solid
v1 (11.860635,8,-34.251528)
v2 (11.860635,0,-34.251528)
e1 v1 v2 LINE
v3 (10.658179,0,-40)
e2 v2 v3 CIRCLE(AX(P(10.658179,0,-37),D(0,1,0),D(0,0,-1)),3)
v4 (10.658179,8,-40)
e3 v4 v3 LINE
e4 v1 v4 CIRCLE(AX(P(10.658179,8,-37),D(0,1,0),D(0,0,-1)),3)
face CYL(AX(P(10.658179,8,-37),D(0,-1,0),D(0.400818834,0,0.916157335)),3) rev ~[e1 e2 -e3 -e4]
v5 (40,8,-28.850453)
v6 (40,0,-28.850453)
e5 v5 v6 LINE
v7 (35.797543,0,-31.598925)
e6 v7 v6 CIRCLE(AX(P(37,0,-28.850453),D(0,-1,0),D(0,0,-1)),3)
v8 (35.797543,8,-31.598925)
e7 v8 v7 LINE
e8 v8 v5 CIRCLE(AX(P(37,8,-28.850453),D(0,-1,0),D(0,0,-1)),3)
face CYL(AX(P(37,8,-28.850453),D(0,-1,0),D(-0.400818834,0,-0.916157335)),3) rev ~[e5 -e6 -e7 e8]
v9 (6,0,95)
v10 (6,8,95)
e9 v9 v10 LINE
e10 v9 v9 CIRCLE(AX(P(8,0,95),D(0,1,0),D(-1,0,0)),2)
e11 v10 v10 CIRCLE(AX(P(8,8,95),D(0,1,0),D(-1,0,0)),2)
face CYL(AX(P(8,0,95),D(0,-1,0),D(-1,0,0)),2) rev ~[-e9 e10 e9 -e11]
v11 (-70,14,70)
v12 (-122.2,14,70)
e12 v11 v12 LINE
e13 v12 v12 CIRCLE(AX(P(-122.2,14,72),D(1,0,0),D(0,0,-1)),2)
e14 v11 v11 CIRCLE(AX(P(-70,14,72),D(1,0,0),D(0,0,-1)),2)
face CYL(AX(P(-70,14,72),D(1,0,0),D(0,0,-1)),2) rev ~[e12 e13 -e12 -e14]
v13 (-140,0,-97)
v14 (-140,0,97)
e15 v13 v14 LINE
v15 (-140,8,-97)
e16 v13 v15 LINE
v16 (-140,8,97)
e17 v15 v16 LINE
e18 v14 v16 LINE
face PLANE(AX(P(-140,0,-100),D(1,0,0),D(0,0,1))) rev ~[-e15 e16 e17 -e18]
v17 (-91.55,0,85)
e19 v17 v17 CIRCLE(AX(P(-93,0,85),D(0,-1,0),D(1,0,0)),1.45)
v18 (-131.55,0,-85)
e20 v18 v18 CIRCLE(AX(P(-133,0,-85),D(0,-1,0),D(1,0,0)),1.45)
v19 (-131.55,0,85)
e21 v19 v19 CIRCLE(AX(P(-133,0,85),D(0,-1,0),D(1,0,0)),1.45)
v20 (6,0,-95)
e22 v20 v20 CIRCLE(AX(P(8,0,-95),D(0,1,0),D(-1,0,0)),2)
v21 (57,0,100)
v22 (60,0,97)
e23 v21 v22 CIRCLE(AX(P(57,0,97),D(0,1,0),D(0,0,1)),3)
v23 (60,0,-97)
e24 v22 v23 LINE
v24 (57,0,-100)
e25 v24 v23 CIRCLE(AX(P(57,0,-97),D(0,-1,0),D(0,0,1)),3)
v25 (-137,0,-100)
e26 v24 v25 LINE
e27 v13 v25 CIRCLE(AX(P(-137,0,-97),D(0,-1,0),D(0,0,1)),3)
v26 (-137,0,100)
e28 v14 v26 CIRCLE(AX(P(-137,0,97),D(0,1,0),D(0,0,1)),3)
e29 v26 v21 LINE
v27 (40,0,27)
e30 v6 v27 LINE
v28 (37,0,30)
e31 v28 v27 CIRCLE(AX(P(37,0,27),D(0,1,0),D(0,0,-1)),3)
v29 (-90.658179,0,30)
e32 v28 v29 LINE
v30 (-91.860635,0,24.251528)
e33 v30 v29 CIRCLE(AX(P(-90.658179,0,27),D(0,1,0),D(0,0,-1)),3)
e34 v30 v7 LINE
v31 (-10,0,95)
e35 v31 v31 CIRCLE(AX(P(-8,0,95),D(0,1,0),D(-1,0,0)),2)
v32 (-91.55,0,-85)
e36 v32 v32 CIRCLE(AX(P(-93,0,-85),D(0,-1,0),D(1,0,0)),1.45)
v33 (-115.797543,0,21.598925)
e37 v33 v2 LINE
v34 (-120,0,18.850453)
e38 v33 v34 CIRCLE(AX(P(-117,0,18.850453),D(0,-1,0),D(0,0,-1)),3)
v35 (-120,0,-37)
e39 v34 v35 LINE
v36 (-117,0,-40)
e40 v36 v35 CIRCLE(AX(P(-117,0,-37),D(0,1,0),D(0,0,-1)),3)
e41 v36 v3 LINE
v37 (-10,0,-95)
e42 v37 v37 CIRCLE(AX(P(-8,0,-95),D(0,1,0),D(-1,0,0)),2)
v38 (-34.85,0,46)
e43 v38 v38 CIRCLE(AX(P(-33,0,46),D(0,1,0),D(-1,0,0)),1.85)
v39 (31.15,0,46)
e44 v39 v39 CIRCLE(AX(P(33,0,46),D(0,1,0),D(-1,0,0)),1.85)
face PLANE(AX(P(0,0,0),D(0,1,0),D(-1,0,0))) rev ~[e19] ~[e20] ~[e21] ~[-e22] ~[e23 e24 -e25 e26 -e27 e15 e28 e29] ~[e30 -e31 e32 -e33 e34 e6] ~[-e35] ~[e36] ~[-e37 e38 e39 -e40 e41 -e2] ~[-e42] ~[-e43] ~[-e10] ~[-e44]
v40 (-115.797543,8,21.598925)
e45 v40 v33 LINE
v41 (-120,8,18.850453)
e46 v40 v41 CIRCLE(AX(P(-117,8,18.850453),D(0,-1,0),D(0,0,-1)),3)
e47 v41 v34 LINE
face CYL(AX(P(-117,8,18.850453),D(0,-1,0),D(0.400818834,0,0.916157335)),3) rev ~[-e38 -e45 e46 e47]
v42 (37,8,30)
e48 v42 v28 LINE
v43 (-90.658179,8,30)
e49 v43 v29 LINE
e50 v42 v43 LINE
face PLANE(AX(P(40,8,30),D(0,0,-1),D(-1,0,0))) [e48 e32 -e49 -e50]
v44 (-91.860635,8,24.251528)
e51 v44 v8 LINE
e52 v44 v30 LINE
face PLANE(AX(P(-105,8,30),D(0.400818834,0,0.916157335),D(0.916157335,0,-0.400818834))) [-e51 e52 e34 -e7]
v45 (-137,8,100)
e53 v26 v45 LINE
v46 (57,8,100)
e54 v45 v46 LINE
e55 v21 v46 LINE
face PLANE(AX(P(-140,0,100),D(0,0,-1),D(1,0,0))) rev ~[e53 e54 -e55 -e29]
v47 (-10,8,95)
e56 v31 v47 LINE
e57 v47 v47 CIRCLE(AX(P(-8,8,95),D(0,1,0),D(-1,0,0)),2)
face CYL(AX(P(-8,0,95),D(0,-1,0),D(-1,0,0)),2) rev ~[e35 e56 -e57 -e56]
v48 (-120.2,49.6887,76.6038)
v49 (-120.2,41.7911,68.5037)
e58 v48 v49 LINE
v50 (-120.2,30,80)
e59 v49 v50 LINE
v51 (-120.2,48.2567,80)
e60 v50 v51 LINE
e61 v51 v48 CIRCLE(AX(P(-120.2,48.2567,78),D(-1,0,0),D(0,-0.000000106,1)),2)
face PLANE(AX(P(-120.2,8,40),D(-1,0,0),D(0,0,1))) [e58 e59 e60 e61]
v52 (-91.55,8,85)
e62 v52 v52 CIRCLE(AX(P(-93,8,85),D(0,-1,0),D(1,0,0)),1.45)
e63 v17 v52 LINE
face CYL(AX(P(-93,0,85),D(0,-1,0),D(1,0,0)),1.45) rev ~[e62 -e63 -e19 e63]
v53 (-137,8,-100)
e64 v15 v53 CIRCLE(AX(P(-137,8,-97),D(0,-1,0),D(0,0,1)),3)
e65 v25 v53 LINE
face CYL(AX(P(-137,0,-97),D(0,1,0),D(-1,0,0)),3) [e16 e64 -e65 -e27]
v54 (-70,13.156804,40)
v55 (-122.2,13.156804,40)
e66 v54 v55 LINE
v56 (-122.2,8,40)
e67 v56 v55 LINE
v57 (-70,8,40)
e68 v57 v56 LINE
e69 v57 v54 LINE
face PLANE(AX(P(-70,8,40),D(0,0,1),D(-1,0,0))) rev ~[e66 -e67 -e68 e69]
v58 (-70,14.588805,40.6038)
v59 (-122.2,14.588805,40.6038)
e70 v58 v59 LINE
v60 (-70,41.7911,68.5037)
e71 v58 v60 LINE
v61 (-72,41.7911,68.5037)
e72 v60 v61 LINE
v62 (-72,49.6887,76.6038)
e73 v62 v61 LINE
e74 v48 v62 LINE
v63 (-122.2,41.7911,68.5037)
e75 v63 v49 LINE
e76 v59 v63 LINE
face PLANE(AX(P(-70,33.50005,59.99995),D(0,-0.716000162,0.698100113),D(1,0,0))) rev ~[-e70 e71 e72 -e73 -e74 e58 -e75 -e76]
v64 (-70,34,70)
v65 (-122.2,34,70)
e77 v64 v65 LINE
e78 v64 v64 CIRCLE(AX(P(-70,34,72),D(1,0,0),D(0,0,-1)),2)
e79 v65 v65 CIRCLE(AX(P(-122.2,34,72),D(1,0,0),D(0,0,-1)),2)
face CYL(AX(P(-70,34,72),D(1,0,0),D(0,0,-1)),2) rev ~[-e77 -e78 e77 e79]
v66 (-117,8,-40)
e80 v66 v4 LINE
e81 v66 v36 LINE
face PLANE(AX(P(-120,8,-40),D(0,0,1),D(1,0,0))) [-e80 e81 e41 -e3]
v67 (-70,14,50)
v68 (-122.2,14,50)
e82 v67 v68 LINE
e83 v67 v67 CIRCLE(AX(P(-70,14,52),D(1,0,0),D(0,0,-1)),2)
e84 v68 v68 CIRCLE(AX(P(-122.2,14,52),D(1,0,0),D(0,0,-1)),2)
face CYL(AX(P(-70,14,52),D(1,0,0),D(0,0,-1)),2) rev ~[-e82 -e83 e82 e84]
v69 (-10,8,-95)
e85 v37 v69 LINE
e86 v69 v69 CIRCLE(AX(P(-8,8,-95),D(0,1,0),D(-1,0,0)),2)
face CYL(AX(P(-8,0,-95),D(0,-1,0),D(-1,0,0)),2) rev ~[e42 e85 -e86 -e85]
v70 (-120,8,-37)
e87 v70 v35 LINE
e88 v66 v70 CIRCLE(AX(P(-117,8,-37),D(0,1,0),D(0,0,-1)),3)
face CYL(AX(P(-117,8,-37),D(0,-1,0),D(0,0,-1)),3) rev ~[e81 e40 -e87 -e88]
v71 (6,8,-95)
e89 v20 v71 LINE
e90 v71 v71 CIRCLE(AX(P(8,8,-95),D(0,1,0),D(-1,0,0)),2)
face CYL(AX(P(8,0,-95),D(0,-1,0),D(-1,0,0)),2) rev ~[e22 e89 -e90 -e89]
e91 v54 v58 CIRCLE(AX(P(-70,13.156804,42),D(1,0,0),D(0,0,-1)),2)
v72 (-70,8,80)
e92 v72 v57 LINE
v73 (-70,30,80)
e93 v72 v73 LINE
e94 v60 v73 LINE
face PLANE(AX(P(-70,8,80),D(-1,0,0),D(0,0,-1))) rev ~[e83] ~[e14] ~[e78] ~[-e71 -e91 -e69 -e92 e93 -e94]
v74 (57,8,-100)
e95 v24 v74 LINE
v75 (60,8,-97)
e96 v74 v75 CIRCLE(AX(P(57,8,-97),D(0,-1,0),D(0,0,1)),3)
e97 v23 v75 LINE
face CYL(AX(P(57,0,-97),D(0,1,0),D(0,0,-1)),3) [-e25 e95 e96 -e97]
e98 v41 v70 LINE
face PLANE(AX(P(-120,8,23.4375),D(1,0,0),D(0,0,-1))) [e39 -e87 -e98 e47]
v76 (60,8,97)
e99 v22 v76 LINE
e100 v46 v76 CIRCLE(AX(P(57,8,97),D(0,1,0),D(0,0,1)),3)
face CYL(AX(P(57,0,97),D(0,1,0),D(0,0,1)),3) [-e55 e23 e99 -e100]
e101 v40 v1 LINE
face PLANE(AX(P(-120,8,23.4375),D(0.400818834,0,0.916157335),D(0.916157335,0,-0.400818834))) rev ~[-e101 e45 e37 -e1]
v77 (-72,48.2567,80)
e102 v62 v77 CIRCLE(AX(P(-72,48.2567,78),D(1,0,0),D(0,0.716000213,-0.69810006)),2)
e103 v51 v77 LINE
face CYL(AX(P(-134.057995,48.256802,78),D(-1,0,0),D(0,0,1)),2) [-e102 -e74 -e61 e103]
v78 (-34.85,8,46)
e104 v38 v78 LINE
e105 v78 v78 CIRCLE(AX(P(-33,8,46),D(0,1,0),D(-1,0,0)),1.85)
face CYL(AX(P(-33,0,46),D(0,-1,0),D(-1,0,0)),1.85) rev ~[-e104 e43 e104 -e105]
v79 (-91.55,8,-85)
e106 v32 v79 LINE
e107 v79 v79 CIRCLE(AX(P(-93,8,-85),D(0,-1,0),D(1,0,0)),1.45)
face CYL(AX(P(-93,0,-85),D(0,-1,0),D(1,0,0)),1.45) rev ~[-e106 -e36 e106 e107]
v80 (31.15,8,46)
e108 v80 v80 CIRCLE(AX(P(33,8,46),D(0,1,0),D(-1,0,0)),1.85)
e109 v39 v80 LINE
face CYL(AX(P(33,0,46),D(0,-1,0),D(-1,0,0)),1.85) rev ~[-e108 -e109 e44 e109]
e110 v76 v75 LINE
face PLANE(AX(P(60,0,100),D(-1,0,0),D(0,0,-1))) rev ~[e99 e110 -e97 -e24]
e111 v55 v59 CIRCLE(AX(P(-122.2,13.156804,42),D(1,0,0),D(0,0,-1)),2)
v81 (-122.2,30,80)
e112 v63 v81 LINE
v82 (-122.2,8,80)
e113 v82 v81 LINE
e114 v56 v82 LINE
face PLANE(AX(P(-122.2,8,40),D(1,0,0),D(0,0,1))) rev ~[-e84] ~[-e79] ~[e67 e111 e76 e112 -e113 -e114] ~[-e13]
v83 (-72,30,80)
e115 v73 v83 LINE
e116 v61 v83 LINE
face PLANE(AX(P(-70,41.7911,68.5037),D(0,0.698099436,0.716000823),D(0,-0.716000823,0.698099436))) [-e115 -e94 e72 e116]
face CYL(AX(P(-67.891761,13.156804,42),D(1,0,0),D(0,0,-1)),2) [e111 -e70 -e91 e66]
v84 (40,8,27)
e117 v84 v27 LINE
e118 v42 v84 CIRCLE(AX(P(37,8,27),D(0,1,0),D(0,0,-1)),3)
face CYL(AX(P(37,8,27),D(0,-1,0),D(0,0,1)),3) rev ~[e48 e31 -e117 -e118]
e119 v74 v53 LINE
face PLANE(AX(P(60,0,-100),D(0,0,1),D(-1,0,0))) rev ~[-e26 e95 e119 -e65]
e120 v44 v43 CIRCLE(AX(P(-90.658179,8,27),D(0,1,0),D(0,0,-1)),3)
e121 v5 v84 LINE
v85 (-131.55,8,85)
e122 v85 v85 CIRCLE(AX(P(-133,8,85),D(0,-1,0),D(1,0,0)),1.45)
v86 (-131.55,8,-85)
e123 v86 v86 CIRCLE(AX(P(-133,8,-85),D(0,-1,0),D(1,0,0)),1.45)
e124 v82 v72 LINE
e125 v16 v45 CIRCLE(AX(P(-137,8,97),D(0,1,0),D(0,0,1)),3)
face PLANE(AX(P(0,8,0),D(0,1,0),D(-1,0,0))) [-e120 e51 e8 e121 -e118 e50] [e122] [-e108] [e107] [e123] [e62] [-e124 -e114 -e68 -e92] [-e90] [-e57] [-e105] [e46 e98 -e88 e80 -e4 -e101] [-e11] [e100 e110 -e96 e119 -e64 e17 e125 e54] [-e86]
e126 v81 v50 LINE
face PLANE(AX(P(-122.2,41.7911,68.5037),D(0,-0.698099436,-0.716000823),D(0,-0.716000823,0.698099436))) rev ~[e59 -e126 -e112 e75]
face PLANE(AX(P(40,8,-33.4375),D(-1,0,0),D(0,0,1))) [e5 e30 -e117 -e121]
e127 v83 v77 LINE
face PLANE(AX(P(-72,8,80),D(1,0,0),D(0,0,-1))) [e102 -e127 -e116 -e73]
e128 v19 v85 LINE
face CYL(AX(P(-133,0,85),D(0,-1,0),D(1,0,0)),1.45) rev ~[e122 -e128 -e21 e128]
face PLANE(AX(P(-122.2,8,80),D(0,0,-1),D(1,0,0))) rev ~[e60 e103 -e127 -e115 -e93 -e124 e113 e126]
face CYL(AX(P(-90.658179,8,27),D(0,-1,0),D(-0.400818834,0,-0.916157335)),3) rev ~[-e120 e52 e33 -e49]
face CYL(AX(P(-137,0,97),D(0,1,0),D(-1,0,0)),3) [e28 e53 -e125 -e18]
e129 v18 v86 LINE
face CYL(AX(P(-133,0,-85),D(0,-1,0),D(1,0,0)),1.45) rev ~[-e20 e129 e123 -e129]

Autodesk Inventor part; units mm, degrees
ref_plane "YZ Plane" through (0, 0, 0) normal (1, 0, 0) x (0, 1, 0)
ref_plane "XZ Plane" through (0, 0, 0) normal (0, 1, 0) x (-1, 0, 0)
ref_plane "XY Plane" through (0, 0, 0) normal (0, 0, 1) x (1, 0, 0)
sketch "Sketch1" plane through (0, 0, 0) normal (0, 1, 0) x (-1, 0, 0)
  line L0 (140, 100) -> (-60, 100)
  line L1 (-60, 100) -> (-60, -100)
  line L2 (-60, -100) -> (140, -100)
  line L3 (140, -100) -> (140, 100)
  line L4 (180, 0) -> (-100, 0) construction
  circle A0 centre (8, 95) radius 2
  circle A1 centre (-8, 95) radius 2
  line L5 (8, 95) -> (-8, 95) construction
  line L6 (0, -140) -> (0, 140) construction
  circle A2 centre (8, -95) radius 2
  circle A3 centre (-8, -95) radius 2
  circle A4 centre (-33, 46) radius 1.85
  circle A5 centre (33, 46) radius 1.85
  line L7 (33, 46) -> (-33, 46) construction
  point P0 (0, 0)
  point P1 (0, 95)
  point P2 (0, 46)
  dimension "d0" = 200
  dimension "d1" = 200
  dimension "d2" = 60
  dimension "d3" = 4
  dimension "d4" = 16
  dimension "d6" = 5
  dimension "d9" = 3.7
  dimension "d10" = 66
  dimension "d11" = 46
extrude "Extrusion1" add sketch "Sketch1" along normal blind 8
sketch "Sketch2" plane through (0, 8, 0) normal (0, 1, 0) x (1, 0, 0)
  line L0 (-122.2, -80) -> (-70, -80)
  line L1 (-70, -80) -> (-70, -40)
  line L2 (-70, -40) -> (-122.2, -40)
  line L3 (-122.2, -40) -> (-122.2, -80)
  line L4 (-140, -100) -> (60, -100) construction
  point P0 (0, 0)
  dimension "d12" = 52.2
  dimension "d13" = 40
  dimension "d14" = 70
  dimension "d15" = 20
extrude "Extrusion2" add sketch "Sketch2" along normal blind 45
chamfer "Chamfer1" distance 39 distance2 40 1 edges at (-96.1, 53, 40) measured on face at (-87.4, 38, 40)
fillet "Fillet1" radius 2 3 edges at (-96.1, 53, 79.9999) (-96.1, 53, 80) (-96.1, 14.0001, 40)
sketch "Sketch3" plane through (-70, 8, 80) normal (1, 0, 0) x (0, 0, -1)
  line L0 (40, 0) -> (0, 0) construction
  line L1 (0, 0) -> (0, 40.2567) construction
  circle A0 centre (8, 6) radius 2
  circle A1 centre (28, 6) radius 2
  circle A2 centre (8, 26) radius 2
  line L2 (8, 6) -> (28, 6) construction
  line L3 (8, 6) -> (8, 26) construction
  point P0 (80, -8)
  dimension "d22" = 4
  dimension "d23" = 20
  dimension "d24" = 20
  dimension "d25" = 8
  dimension "d26" = 6
extrude "Extrusion3" cut sketch "Sketch3" against normal up to surface (52.2 mm away)
sketch "Sketch6" plane through (-70, 8, 80) normal (1, 0, 0) x (0, 0, -1)
  line L0 (0, 0) -> (0, 40.2567) projected
  arc A0 (3.3962, 41.6887) -> (0, 40.2567) centre (2, 40.2567) ccw projected
  line L1 (3.3962, 41.6887) -> (39.3962, 6.5887) projected
  line L2 (11.4963, 33.7911) -> (0, 22)
  point P0 (80, -8)
  dimension "d45" = 22
extrude "Extrusion6" cut sketch "Sketch6" against normal blind 2
sketch "Sketch7" plane through (-122.2, 8, 40) normal (-1, 0, 0) x (0, 0, 1)
  line L0 (28.5037, 33.7911) -> (40, 22) projected
  line L1 (40, 0) -> (40, 40.2567) projected
  arc A0 (40, 40.2567) -> (36.6038, 41.6887) centre (38, 40.2567) ccw projected
  line L2 (36.6038, 41.6887) -> (0.6038, 6.5887) projected
  point P0 (-40, -8)
extrude "Extrusion7" cut sketch "Sketch7" against normal blind 2
sketch "Sketch4" plane through (0, 0, 0) normal (0, -1, 0) x (1, 0, 0)
  circle A0 centre (-133, 85) radius 1.45
  circle A1 centre (-93, 85) radius 1.45
  line L0 (-133, 85) -> (-93, 85) construction
  line L1 (-113, 85) -> (-113, -85) construction
  line L2 (-133, -85) -> (-93, -85) construction
  circle A2 centre (-133, -85) radius 1.45
  circle A3 centre (-93, -85) radius 1.45
  line L3 (-180, 0) -> (100, 0) construction
  line L4 (-140, 100) -> (60, 100) construction
  point P0 (0, 0)
  dimension "d29" = 2.9
  dimension "d30" = 40
  dimension "d31" = 15
  dimension "d32" = 7
extrude "Extrusion4" cut sketch "Sketch4" against normal up to surface (8 mm away)
fillet "Fillet2" radius 3 4 edges at (60, 4, 100) (-140, 4, 100) (-140, 4, -100) (60, 4, -100)
sketch "Sketch5" plane through (0, 8, 0) normal (0, 1, 0) x (1, 0, 0)
  line L0 (-120, -23.4375) -> (-120, 40)
  line L1 (-120, 40) -> (25, 40)
  line L2 (40, 40) -> (-120, -30) construction
  line L3 (40, 33.4375) -> (40, -30)
  line L4 (40, -30) -> (-105, -30)
  line L5 (-105, -30) -> (40, 33.4375)
  line L6 (-120, -30) -> (-105, -30) construction
  line L7 (40, 40) -> (40, 33.4375) construction
  line L8 (-137, -100) -> (57, -100) construction
  line L9 (60, -97) -> (60, 97) construction
  line L10 (-120, -23.4375) -> (25, 40)
  line L11 (-120, -23.4375) -> (-120, -30) construction
  line L12 (25, 40) -> (40, 40) construction
  point P0 (0, 0)
  dimension "d36" = 160
  dimension "d37" = 70
  dimension "d39" = 15
  dimension "d40" = 70
  dimension "d41" = 20
extrude "Extrusion5" cut sketch "Sketch5" against normal up to surface (8 mm away)
fillet "Fillet3" radius 3 6 edges at (-105, 4, 30) (40, 4, -33.4375) (40, 4, 30) (-120, 4, 23.4375) (-120, 4, -40) (25, 4, -40)
properties part number "Chassis"
